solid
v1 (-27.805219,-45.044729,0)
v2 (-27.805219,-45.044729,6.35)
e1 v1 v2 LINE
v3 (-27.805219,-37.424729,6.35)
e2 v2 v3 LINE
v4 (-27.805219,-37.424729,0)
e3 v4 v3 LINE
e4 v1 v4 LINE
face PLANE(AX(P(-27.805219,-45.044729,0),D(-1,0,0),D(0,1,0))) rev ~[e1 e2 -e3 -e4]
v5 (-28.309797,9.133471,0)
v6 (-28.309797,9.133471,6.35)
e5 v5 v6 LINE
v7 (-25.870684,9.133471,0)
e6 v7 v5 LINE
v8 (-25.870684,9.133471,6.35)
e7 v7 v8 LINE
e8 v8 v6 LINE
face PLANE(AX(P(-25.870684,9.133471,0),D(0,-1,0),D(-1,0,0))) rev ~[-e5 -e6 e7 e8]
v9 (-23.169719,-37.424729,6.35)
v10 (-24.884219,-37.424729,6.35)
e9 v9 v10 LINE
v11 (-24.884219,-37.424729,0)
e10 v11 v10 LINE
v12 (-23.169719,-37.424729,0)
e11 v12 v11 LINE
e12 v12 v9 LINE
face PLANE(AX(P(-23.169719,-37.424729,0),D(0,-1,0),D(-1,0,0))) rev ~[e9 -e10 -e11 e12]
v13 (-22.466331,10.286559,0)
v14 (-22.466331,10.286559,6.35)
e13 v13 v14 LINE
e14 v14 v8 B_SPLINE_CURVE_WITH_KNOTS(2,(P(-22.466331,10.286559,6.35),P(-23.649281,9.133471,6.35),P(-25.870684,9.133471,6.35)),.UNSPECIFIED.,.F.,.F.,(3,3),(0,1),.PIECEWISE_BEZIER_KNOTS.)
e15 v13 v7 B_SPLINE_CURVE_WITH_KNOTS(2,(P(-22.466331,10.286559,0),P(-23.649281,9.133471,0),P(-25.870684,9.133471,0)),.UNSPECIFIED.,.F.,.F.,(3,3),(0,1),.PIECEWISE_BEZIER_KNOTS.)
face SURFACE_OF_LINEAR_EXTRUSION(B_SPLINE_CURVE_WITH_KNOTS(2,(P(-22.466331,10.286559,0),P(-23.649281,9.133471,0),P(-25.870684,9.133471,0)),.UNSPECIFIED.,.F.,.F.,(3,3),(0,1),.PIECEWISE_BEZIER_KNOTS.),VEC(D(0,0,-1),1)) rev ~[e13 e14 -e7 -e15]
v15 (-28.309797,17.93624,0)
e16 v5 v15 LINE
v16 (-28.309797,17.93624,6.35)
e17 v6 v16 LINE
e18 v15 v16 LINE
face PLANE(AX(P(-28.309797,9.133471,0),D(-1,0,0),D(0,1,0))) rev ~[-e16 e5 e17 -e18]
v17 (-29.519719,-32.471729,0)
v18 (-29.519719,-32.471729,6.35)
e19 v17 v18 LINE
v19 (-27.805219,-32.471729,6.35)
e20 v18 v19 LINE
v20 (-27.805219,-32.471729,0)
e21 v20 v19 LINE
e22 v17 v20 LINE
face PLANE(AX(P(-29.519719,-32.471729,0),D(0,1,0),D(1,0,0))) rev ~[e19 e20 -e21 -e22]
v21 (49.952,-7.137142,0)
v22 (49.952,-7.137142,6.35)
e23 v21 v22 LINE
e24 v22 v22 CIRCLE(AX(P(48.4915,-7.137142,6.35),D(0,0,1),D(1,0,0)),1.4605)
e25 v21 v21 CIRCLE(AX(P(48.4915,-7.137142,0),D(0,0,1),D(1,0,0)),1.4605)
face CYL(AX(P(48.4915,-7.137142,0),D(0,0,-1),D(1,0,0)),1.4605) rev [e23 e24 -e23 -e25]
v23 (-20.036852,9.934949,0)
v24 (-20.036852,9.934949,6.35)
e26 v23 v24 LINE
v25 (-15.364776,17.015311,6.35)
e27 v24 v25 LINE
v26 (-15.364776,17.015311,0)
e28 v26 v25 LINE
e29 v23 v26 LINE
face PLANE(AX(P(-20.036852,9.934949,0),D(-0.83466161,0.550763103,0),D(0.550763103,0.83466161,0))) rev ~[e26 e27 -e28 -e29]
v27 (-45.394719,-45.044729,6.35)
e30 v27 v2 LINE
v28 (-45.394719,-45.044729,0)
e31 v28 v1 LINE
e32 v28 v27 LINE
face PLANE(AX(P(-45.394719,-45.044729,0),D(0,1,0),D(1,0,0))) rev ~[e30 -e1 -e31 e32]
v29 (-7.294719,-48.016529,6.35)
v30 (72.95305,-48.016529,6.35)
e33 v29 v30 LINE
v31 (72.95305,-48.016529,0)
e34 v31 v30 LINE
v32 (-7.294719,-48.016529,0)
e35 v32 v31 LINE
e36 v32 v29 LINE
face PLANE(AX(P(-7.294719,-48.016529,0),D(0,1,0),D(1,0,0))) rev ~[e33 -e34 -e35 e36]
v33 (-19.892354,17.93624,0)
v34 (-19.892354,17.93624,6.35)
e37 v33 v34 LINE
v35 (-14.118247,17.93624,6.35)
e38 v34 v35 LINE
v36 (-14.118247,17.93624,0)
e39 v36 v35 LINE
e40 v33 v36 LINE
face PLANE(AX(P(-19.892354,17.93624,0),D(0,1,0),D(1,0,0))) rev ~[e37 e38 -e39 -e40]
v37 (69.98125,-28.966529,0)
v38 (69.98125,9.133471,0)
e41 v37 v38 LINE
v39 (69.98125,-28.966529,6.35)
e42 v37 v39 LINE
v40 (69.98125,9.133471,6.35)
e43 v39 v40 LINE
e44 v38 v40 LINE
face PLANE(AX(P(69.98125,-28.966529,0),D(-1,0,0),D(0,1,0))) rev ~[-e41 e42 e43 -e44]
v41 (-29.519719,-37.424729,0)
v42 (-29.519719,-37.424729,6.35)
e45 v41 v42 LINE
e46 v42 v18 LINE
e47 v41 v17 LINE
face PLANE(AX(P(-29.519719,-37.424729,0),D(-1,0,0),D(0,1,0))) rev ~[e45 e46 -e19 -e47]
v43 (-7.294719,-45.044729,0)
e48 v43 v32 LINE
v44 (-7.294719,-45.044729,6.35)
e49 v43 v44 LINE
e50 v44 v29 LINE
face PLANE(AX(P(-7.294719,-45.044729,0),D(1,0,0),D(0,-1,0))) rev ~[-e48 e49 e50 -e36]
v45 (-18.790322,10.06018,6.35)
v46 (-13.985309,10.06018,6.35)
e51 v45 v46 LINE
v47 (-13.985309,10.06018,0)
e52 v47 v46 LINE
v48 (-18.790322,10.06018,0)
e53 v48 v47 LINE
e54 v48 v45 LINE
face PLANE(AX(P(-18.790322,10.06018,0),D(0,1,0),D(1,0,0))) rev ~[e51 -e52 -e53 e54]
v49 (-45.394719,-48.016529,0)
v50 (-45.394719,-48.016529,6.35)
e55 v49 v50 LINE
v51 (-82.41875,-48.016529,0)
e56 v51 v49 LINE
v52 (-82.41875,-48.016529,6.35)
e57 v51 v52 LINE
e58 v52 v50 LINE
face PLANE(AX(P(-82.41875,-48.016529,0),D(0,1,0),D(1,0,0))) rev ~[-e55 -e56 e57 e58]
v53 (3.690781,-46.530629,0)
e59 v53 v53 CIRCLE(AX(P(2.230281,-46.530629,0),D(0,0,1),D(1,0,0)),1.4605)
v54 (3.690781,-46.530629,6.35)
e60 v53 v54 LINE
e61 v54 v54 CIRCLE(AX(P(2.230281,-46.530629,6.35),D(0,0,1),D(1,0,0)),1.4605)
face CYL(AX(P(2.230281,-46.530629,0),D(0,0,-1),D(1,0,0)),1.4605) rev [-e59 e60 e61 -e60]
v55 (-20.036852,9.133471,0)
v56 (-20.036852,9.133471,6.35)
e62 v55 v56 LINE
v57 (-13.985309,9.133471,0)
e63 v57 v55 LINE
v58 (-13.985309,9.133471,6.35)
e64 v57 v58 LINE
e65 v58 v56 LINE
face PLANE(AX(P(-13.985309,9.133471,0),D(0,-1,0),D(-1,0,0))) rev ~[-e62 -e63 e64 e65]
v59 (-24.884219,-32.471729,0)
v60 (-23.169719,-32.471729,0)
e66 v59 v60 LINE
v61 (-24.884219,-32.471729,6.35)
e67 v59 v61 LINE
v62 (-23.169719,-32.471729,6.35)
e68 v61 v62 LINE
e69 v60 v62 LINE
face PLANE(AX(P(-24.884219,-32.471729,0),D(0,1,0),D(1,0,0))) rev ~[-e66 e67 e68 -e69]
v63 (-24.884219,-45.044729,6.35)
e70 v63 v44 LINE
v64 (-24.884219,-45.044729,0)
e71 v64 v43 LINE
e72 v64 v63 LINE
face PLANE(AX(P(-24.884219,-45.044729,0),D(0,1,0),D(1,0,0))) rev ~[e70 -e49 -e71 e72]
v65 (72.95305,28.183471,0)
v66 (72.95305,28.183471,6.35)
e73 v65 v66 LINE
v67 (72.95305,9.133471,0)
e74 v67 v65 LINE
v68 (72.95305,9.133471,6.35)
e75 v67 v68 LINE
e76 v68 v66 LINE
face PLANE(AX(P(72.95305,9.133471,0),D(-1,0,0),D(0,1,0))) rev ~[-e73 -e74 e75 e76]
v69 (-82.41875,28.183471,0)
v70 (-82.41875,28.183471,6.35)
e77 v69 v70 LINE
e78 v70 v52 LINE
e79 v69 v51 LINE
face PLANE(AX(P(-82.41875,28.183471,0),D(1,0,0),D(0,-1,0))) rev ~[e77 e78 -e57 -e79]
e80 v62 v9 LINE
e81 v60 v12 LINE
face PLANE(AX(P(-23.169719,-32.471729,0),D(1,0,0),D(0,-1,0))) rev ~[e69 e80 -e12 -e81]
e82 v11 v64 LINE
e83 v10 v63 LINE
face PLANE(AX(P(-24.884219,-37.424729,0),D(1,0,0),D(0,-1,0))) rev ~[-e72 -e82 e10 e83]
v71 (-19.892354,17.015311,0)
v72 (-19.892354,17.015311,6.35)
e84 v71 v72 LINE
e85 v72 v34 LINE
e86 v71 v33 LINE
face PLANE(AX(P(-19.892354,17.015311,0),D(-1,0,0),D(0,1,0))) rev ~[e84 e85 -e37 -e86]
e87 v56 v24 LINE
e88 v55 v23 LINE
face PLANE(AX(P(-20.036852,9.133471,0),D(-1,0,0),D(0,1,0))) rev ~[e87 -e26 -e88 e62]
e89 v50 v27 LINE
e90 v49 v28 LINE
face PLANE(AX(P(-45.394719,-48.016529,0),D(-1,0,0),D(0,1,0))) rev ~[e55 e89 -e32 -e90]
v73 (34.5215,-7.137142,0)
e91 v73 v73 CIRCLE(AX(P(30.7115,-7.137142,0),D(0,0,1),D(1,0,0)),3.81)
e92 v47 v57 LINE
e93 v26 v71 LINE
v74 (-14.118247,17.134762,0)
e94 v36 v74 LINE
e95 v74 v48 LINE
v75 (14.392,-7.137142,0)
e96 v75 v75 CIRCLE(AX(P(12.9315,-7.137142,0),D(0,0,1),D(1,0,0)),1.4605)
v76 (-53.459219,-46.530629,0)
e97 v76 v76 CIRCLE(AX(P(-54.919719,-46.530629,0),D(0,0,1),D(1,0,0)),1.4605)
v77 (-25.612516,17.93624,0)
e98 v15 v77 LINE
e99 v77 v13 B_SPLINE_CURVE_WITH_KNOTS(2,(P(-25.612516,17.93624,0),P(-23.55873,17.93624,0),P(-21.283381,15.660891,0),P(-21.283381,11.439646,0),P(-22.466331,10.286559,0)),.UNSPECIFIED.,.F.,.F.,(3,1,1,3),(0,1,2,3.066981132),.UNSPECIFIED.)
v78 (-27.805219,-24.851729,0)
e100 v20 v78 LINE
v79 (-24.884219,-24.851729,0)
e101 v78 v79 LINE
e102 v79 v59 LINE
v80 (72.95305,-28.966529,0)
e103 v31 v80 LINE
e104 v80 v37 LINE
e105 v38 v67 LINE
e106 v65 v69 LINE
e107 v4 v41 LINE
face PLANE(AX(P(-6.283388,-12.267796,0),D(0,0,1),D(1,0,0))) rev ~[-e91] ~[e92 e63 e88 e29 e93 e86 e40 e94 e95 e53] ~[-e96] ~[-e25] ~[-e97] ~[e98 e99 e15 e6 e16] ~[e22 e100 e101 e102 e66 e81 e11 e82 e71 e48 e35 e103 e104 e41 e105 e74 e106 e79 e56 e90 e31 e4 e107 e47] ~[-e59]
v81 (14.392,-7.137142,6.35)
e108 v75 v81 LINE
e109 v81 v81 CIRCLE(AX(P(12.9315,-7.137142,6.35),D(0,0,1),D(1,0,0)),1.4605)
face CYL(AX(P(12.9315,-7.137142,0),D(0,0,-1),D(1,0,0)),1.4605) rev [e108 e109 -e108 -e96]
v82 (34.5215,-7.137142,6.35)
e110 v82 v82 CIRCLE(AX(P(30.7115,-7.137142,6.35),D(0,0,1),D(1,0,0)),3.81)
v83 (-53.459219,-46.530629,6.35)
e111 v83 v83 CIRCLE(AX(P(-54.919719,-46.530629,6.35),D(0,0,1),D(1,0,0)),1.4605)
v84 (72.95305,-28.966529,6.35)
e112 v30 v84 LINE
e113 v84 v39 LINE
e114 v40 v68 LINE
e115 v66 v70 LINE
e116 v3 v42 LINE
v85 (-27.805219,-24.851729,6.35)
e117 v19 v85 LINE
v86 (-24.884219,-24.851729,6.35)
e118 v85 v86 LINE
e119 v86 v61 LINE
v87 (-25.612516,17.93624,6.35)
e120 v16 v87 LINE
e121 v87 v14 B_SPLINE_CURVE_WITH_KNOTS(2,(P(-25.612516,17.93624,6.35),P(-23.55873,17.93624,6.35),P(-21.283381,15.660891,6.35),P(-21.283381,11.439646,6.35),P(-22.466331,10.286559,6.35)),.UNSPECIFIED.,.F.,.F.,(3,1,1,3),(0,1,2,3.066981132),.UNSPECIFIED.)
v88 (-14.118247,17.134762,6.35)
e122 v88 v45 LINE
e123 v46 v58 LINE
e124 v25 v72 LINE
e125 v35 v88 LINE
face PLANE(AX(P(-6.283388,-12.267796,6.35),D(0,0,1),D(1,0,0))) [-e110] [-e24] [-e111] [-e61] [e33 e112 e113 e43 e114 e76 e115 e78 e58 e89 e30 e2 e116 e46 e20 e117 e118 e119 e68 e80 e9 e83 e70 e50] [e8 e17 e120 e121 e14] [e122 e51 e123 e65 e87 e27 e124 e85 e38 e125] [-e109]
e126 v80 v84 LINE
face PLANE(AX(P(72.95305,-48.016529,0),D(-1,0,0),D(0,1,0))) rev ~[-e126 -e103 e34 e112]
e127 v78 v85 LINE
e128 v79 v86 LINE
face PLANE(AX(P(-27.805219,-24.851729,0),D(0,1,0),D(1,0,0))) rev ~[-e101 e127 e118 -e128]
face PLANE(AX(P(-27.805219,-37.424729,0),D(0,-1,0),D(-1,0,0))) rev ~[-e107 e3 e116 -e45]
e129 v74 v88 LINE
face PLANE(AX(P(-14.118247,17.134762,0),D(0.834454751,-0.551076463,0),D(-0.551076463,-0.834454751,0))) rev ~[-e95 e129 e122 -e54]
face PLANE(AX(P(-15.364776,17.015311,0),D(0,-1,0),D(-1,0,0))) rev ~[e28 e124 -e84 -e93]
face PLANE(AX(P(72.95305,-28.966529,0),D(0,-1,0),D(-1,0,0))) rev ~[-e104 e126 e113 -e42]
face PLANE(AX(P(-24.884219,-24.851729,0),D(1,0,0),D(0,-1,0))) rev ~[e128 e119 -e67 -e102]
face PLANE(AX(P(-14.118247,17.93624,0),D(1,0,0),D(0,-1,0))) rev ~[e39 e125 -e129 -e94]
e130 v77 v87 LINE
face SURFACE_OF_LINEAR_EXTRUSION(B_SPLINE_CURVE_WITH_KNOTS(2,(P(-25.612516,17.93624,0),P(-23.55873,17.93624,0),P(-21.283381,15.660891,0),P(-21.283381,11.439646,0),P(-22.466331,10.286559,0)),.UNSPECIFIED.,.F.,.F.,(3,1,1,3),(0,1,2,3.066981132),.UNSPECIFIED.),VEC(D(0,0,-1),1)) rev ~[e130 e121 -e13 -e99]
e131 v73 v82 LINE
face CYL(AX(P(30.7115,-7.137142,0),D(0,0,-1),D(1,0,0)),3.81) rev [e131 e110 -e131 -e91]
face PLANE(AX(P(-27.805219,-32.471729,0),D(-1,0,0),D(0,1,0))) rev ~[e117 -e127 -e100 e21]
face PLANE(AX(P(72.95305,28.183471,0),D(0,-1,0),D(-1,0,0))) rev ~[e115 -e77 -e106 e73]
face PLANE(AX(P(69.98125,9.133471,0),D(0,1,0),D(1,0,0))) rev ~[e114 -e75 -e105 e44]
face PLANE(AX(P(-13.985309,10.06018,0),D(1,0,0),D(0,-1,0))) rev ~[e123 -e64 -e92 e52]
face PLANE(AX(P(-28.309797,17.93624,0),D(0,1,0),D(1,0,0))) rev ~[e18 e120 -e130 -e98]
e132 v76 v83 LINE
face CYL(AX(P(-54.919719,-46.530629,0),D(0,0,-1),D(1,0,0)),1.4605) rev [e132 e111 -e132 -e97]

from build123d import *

# Parameters (mm, degrees)
F0_R     = 1.4605
F0_R_2   = 3.81
F1_DEPTH = 6.35


# Not quite as in the source:
# - a feature names something its author has since deleted; it is built from what else it names


with BuildPart() as f1:
    # F0 (on Top) → F1 (new body)
    with BuildSketch(Plane.XY):
        Polygon((72.9530500723, 9.1334713354), (72.9530500723, 28.1834713354), (-82.4187499277, 28.1834713354), (-82.4187499277, -48.0165286646), (-45.3947193277, -48.0165286646), (-45.3947193277, -45.0447286646), (-27.8052193277, -45.0447286646), (-27.8052193277, -37.4247286646), (-29.5197193277, -37.4247286646), (-29.5197193277, -32.4717286646), (-27.8052193277, -32.4717286646), (-27.8052193277, -24.8517286646), (-26.3447193277, -24.8517286646), (-24.8842193277, -24.8517286646), (-24.8842193277, -32.4717286646), (-23.1697193277, -32.4717286646), (-23.1697193277, -37.4247286646), (-24.8842193277, -37.4247286646), (-24.8842193277, -45.0447286646), (-7.2947193277, -45.0447286646), (-7.2947193277, -48.0165286646), (11.7552806723, -48.0165286646), (72.9530500723, -48.0165286646), (72.9530500723, -28.9665286646), (69.9812500723, -28.9665286646), (69.9812500723, 9.1334713354), align=None)
        with Locations((-54.9197193277, -46.5306286646)):
            Circle(F0_R, mode=Mode.SUBTRACT)
        with Locations((2.2302806723, -46.5306286646)):
            Circle(F0_R, mode=Mode.SUBTRACT)
        with BuildLine():
            add(Edge.make_bspline(
                [(-22.4210550397, 16.7985652577), (-21.283380549, 15.660890767), (-21.283380549, 13.6186639082)],
                knots=[0, 0, 0, 1, 1, 1], degree=2))
            add(Edge.make_bspline(
                [(-21.283380549, 13.6186639082), (-21.283380549, 11.4396463825), (-22.4663308238, 10.2865588589)],
                knots=[0, 0, 0, 1, 1, 1], degree=2))
            add(Edge.make_bspline(
                [(-22.4663308238, 10.2865588589), (-23.6492810986, 9.1334713354), (-25.8706844648, 9.1334713354)],
                knots=[0, 0, 0, 1, 1, 1], degree=2))
            Line((-25.8706844648, 9.1334713354), (-28.3097969206, 9.1334713354))
            Line((-28.3097969206, 9.1334713354), (-28.3097969206, 17.9362397483))
            Line((-28.3097969206, 17.9362397483), (-25.6125161638, 17.9362397483))
            add(Edge.make_bspline(
                [(-25.6125161638, 17.9362397483), (-23.5587295303, 17.9362397483), (-22.4210550397, 16.7985652577)],
                knots=[0, 0, 0, 1, 1, 1], degree=2))
        make_face(mode=Mode.SUBTRACT)
        Polygon((-13.9853094725, 10.0601799383), (-13.9853094725, 9.1334713354), (-20.0368515135, 9.1334713354), (-20.0368515135, 9.934949046), (-15.3647759168, 17.0153110328), (-19.8923543301, 17.0153110328), (-19.8923543301, 17.9362397483), (-14.1182468813, 17.9362397483), (-14.1182468813, 17.1347620377), (-18.790322478, 10.0601799383), align=None, mode=Mode.SUBTRACT)
        with Locations((12.9314999741, -7.1371421218)):
            Circle(F0_R, mode=Mode.SUBTRACT)
        with Locations((30.7114999741, -7.1371421218)):
            Circle(F0_R_2, mode=Mode.SUBTRACT)
        with Locations((48.4914999741, -7.1371421218)):
            Circle(F0_R, mode=Mode.SUBTRACT)
    extrude(amount=F1_DEPTH)


solid = f1.part
